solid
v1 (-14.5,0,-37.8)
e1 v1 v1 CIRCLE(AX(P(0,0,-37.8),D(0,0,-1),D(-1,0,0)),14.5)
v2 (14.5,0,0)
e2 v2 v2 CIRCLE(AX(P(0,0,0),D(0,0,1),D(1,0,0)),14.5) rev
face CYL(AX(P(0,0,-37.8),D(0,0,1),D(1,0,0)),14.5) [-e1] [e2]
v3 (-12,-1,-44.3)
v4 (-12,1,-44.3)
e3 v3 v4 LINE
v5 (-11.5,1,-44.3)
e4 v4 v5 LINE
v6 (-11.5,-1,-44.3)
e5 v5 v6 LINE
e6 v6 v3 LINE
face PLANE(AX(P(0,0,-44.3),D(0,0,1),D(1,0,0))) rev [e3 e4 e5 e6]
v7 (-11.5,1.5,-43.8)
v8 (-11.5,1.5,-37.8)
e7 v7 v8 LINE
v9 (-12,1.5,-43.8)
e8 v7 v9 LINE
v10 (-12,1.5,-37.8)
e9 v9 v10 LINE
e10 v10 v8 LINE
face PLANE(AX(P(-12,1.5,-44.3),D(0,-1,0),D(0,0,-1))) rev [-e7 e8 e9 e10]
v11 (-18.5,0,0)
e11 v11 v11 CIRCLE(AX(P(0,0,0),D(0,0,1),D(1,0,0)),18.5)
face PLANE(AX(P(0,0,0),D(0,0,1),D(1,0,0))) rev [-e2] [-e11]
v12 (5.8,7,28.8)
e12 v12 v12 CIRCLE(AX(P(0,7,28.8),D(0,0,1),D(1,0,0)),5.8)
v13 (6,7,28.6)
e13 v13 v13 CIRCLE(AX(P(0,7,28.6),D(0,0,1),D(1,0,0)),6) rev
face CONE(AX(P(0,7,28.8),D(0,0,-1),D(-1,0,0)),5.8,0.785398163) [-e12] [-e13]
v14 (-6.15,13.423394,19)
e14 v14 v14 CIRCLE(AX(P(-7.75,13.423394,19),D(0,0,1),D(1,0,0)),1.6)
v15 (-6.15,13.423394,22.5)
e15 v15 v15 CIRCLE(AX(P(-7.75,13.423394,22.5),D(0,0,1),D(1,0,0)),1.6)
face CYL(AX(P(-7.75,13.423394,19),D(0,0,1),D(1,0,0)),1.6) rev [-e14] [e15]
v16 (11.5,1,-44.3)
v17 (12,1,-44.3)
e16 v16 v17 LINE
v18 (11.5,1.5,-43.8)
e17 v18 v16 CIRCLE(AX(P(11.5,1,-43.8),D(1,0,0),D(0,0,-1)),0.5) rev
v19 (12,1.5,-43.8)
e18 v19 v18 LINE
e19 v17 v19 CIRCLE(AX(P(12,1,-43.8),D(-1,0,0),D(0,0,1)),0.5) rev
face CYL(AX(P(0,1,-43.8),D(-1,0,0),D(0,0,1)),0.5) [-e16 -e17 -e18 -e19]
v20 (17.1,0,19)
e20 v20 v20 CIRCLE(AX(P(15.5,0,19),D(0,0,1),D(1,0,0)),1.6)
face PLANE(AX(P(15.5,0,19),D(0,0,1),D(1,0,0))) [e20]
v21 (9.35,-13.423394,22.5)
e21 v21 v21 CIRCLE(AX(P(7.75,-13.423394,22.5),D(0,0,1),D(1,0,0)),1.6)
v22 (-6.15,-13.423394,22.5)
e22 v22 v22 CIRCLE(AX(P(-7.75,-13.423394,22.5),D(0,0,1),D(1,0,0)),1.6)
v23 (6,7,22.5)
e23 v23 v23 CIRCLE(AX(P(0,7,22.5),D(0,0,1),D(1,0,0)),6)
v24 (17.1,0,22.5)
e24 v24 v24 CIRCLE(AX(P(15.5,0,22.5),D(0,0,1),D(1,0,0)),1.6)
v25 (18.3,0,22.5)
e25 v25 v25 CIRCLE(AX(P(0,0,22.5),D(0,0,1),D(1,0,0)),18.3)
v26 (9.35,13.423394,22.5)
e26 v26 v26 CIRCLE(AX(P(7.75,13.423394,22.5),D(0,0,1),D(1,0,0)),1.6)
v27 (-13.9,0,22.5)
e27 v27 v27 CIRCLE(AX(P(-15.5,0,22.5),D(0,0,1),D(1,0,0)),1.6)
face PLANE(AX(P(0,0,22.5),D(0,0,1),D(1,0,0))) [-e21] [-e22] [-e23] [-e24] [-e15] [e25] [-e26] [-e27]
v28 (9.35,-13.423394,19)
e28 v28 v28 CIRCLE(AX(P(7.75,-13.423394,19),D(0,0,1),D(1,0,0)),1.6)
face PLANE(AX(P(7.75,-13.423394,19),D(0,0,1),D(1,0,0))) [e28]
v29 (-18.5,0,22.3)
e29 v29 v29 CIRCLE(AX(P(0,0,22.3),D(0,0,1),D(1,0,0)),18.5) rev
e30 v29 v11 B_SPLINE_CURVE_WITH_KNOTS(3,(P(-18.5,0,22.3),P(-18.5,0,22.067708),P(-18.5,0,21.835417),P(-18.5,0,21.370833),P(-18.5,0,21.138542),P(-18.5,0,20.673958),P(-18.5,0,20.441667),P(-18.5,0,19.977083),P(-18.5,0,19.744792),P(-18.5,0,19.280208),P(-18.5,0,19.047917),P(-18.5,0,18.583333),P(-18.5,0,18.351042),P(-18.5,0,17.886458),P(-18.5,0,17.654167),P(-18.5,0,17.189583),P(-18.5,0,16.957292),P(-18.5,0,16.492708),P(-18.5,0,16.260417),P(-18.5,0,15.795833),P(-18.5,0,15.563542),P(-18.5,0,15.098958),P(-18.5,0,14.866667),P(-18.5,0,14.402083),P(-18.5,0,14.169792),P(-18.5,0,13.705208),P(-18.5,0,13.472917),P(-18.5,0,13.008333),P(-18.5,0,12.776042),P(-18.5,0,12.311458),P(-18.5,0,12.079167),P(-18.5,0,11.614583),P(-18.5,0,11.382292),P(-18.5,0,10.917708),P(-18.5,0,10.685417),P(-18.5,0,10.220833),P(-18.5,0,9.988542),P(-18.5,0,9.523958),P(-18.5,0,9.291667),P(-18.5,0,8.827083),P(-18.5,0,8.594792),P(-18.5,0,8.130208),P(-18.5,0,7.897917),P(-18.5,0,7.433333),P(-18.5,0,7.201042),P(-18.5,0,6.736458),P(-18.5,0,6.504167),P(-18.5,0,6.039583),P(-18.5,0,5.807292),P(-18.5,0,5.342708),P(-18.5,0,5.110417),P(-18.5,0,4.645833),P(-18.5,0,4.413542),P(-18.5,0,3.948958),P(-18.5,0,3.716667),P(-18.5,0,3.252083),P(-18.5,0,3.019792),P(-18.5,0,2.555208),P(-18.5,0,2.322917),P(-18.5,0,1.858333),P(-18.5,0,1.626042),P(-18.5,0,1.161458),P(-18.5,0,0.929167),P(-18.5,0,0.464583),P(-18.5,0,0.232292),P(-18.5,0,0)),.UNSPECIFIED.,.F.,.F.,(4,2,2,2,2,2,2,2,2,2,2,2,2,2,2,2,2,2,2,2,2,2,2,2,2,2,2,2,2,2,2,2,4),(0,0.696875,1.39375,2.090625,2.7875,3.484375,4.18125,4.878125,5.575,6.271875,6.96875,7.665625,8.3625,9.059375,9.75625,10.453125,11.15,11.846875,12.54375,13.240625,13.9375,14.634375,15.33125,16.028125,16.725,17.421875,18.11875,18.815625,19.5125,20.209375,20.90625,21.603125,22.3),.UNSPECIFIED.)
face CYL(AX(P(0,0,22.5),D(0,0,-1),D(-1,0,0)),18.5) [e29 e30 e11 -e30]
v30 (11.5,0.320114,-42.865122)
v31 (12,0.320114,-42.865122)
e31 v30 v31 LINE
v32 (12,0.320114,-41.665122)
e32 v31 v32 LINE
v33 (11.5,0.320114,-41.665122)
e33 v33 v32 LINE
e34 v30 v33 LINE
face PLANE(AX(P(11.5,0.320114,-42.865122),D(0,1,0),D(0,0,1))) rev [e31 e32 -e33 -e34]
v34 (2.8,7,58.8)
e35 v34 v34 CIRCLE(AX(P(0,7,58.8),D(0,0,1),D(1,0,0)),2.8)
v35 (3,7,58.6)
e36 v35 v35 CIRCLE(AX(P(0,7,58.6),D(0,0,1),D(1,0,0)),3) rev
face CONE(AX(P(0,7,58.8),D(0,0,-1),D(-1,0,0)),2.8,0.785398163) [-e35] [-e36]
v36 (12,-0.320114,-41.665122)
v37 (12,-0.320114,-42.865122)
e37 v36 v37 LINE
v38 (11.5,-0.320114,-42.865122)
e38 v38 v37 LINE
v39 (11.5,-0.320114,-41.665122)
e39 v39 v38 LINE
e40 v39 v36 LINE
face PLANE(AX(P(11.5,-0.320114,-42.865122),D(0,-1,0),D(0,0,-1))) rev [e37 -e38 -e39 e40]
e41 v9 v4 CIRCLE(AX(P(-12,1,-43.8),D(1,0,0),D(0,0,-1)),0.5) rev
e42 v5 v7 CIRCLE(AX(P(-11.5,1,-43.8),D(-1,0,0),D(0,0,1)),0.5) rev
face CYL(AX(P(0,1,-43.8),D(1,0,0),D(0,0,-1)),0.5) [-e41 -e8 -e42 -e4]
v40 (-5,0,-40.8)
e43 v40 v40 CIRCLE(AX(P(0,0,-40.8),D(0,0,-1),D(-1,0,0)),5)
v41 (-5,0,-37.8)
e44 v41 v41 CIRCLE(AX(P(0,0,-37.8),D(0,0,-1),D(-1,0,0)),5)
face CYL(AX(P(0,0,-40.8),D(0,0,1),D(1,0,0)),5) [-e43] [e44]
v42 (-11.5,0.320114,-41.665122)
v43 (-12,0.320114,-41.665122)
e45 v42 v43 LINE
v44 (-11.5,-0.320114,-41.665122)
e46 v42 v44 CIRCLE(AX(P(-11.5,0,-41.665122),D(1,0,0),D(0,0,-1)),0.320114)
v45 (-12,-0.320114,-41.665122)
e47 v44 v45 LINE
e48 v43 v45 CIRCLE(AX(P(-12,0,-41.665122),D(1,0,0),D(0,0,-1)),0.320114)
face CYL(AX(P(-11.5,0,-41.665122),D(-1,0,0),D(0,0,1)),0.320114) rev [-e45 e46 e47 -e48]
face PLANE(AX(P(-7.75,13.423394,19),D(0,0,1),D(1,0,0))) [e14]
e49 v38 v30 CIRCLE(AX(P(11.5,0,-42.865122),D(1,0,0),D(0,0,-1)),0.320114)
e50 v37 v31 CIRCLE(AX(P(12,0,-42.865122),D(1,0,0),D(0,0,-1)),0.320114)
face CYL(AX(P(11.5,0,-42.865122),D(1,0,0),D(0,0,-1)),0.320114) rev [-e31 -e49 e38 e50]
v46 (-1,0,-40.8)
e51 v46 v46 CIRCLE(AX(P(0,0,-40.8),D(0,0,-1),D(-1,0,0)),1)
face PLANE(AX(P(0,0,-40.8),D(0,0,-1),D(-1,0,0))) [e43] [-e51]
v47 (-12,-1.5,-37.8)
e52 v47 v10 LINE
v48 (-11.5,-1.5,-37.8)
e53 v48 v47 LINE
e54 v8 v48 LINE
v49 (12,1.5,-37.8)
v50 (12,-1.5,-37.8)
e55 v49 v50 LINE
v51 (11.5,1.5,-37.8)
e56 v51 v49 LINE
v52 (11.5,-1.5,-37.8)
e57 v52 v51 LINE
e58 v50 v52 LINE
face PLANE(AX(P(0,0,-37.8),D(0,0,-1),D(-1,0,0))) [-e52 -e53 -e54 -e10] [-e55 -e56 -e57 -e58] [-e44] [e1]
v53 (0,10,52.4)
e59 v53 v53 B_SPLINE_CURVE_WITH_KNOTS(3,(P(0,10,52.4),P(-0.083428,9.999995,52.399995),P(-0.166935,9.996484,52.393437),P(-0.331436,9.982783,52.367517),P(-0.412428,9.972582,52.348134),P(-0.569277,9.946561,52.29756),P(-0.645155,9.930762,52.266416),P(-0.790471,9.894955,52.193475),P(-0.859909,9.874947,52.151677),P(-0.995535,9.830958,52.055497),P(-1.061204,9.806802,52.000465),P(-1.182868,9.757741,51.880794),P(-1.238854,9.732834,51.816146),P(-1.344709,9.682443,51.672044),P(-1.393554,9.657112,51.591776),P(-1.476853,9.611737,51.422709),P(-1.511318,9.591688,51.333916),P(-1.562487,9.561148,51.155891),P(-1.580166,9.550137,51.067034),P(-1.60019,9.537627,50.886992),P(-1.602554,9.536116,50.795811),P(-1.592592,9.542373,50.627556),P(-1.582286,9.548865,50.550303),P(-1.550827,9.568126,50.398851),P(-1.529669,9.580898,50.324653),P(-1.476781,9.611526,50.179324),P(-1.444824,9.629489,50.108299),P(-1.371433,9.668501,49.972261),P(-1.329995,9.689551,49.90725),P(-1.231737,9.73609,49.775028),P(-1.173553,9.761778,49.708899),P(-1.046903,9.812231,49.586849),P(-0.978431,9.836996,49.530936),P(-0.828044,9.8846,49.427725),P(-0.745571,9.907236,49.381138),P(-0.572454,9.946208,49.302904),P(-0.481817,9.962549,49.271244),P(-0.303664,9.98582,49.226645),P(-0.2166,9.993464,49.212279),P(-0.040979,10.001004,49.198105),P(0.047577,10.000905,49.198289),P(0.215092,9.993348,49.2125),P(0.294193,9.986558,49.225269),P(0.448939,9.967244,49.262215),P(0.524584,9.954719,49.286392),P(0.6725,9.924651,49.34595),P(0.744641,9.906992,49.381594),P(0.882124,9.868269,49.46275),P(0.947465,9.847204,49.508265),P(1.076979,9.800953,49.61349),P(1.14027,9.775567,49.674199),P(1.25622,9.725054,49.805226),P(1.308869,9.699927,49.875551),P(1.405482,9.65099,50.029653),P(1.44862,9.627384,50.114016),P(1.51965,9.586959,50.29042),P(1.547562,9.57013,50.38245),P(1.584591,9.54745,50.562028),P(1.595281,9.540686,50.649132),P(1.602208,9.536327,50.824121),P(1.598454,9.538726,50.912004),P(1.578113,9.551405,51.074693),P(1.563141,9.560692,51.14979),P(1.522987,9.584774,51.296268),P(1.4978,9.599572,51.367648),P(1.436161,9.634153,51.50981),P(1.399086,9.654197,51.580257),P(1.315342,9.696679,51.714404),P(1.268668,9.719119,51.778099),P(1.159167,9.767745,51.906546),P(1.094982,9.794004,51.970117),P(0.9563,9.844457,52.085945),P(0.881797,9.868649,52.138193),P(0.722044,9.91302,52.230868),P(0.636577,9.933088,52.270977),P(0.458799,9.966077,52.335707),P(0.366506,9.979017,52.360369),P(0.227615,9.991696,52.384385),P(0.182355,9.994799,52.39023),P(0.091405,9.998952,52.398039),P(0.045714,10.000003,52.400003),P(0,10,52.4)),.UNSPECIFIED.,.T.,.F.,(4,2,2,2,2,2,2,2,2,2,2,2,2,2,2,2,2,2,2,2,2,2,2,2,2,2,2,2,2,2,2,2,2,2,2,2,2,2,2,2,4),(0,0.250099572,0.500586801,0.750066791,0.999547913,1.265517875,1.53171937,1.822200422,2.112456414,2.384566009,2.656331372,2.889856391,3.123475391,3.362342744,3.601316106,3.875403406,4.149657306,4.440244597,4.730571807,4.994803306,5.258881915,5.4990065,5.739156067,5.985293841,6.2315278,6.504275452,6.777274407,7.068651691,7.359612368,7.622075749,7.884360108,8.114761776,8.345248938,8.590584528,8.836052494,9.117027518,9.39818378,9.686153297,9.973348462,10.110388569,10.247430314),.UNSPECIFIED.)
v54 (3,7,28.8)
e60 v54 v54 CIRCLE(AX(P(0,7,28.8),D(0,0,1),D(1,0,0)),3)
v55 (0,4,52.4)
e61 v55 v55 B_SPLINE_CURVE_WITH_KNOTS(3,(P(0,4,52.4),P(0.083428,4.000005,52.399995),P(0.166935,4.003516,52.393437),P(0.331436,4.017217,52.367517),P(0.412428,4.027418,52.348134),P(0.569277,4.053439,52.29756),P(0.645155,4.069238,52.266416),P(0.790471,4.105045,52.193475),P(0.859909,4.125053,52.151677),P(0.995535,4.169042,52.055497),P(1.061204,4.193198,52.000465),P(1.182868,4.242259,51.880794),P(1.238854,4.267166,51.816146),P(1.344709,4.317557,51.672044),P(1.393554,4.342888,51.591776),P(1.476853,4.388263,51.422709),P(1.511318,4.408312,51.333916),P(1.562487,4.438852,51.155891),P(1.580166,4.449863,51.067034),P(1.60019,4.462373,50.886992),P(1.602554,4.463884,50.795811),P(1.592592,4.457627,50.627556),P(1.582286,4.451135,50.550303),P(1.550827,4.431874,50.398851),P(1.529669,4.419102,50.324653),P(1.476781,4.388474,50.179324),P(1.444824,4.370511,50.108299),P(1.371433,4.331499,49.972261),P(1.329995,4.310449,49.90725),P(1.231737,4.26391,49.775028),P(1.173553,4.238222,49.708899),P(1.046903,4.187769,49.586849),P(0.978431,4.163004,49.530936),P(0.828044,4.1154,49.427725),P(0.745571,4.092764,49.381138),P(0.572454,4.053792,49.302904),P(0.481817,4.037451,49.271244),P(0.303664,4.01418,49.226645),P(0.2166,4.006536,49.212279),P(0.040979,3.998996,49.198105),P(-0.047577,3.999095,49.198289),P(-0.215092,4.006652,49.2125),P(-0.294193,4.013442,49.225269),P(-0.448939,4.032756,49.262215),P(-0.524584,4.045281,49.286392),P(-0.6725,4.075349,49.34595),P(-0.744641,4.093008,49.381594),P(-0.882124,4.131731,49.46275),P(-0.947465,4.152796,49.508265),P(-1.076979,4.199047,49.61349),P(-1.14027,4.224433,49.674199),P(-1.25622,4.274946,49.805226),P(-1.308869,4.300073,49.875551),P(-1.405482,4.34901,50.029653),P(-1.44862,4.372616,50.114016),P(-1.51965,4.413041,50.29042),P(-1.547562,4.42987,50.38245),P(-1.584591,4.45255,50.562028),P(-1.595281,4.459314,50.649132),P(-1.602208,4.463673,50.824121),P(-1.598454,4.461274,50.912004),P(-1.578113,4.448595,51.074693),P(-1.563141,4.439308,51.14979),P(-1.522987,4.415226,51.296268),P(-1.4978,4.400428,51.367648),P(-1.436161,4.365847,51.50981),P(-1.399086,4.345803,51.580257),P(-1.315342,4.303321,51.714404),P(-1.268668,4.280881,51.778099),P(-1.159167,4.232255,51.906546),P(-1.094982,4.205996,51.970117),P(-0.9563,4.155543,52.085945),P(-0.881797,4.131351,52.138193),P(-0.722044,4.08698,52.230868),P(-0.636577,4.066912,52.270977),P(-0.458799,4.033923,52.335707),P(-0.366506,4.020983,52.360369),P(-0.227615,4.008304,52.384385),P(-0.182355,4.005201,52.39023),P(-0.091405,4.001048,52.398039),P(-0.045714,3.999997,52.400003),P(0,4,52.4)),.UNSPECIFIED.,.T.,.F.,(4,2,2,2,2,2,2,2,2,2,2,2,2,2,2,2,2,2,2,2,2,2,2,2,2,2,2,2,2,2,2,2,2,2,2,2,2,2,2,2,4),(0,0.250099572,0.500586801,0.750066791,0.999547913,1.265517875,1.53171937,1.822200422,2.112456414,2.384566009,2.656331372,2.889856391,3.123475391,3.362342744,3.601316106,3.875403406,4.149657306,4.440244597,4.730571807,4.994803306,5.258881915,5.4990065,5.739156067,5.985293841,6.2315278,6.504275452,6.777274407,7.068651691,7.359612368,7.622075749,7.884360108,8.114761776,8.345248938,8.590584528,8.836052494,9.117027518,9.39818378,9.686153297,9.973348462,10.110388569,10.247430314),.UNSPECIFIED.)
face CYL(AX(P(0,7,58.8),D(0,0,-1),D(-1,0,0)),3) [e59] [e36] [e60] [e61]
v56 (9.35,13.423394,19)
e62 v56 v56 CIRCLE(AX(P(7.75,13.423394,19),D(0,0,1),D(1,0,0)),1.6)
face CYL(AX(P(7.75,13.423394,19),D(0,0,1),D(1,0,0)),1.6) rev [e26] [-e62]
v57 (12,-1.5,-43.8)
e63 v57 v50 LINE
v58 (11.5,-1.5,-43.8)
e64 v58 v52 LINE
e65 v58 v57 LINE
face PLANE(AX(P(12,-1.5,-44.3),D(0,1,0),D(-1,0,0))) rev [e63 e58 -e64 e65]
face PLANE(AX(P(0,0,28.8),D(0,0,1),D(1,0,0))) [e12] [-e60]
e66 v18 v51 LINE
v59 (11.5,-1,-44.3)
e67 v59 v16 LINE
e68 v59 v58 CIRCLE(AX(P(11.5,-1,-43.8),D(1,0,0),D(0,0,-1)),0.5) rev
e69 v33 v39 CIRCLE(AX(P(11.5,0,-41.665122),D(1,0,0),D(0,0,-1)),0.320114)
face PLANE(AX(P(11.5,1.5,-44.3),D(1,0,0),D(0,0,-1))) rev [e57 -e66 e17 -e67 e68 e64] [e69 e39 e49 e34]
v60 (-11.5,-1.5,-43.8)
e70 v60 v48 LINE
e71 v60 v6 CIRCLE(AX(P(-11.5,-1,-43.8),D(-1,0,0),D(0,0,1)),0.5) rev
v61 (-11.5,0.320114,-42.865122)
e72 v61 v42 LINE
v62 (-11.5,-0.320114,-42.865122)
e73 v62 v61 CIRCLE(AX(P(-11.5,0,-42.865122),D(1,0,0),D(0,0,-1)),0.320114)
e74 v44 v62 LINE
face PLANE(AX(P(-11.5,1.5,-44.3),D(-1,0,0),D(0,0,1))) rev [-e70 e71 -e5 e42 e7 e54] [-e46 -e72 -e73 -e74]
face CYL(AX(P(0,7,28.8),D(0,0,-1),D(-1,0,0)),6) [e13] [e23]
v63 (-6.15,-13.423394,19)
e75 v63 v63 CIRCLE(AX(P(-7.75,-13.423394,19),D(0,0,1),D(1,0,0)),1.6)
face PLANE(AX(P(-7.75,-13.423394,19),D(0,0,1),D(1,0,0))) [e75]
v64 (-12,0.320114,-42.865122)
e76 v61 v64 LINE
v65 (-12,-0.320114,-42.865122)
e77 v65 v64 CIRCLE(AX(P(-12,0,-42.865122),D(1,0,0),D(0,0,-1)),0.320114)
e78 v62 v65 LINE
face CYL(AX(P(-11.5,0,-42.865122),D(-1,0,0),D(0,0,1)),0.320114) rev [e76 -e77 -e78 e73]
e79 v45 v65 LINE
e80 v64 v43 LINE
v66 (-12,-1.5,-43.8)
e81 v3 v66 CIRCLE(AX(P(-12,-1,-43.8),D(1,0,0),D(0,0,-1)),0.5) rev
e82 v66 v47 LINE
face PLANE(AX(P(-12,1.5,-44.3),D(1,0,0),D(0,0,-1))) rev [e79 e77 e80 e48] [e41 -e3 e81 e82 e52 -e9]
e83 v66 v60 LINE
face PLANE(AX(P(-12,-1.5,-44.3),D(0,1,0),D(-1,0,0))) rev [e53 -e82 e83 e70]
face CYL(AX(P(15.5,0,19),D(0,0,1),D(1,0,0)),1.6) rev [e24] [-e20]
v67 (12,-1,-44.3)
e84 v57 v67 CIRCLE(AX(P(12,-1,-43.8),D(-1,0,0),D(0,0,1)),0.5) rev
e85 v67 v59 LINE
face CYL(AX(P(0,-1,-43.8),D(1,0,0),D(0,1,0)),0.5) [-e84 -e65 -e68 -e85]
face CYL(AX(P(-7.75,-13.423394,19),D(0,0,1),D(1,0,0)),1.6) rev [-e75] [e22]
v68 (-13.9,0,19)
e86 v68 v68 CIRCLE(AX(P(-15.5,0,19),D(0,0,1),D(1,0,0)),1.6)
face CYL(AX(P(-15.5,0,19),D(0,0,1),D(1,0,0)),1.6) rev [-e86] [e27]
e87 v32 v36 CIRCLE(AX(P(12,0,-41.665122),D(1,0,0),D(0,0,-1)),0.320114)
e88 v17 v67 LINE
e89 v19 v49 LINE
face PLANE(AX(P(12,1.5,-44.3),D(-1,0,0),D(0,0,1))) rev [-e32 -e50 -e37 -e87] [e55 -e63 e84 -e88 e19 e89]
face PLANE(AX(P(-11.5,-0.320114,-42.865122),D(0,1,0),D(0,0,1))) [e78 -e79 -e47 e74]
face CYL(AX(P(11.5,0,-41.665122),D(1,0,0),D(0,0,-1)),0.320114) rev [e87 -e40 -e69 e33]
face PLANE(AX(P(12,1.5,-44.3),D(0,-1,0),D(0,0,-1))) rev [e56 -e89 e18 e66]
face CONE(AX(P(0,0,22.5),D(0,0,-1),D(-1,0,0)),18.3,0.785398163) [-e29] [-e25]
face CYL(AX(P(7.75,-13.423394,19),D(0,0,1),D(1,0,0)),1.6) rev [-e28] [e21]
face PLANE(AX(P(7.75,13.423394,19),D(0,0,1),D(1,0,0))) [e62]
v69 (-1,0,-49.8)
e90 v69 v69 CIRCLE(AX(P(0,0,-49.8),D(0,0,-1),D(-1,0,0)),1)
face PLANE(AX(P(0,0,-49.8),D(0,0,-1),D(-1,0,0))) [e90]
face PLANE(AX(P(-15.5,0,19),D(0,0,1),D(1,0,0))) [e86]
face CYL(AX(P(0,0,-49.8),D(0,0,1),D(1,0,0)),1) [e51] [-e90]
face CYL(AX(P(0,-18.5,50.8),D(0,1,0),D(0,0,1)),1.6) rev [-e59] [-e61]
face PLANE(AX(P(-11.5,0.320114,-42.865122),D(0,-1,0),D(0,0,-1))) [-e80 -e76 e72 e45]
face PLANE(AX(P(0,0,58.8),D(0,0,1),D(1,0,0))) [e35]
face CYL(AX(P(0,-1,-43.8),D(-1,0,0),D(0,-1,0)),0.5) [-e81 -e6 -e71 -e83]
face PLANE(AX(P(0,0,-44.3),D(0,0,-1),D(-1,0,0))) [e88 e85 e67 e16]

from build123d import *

# Parameters (mm, degrees)
SKETCH1_R               = 18.5
BOSS_EXTRUDE1_DEPTH     = 22.5
SKETCH2_R               = 1.6
CUT_EXTRUDE1_DEPTH      = 3.5
SKETCH3_R               = 3
BOSS_EXTRUDE2_DEPTH     = 36.3
SKETCH3_3_R             = 6
SKETCH3_3_R_2           = 3
BOSS_EXTRUDE3_DEPTH     = 6.3
SKETCH4_R               = 14.5
BOSS_EXTRUDE4_DEPTH     = 37.8
SKETCH5_R               = 5
BOSS_EXTRUDE5_DEPTH     = 3
SKETCH6_R               = 1
BOSS_EXTRUDE6_DEPTH     = 9
SKETCH7_W               = 0.5
SKETCH7_H               = 3
BOSS_EXTRUDE7_DEPTH     = 6.5
CUT_EXTRUDE2_DEPTH      = 0.5
FILLET1_R               = 0.5
CHAMFER1_SIZE           = 0.2
CUT_EXTRUDE3_DEPTH      = 67.7078706
CUT_EXTRUDE3_DEPTH_BACK = 67.7078706
SKETCH9_R               = 1.6


with BuildPart() as part:
    # Sketch1 → Boss-Extrude1 (new body)
    with BuildSketch(Plane.XY):
        Circle(SKETCH1_R)
    extrude(amount=BOSS_EXTRUDE1_DEPTH)

    # Sketch2 → Cut-Extrude1 (cut)
    with BuildSketch(Plane.XY.offset(22.5)):
        with Locations((-7.75, 13.423393759)):
            Circle(SKETCH2_R)
        with Locations((7.75, 13.423393759)):
            Circle(SKETCH2_R)
        with Locations((-15.5, 0)):
            Circle(SKETCH2_R)
        with Locations((-7.75, -13.423393759)):
            Circle(SKETCH2_R)
        with Locations((7.75, -13.423393759)):
            Circle(SKETCH2_R)
        with Locations((15.5, 0)):
            Circle(SKETCH2_R)
    extrude(amount=-CUT_EXTRUDE1_DEPTH, mode=Mode.SUBTRACT)

    # Sketch3 → Boss-Extrude2 (add)
    with BuildSketch(Plane.XY.offset(22.5)):
        with Locations((0, 7)):
            Circle(SKETCH3_R)
    extrude(amount=BOSS_EXTRUDE2_DEPTH)

    # Sketch3<3> → Boss-Extrude3 (add)
    with BuildSketch(Plane.XY.offset(22.5)):
        with Locations((0, 7)):
            Circle(SKETCH3_3_R)
        with Locations((0, 7)):
            Circle(SKETCH3_3_R_2, mode=Mode.SUBTRACT)
    extrude(amount=BOSS_EXTRUDE3_DEPTH)

    # Sketch4 → Boss-Extrude4 (add)
    with BuildSketch(Plane(origin=(0, 0, 0), x_dir=(-1, 0, 0), z_dir=(0, 0, -1))):
        Circle(SKETCH4_R)
    extrude(amount=BOSS_EXTRUDE4_DEPTH)

    # Sketch5 → Boss-Extrude5 (add)
    with BuildSketch(Plane(origin=(0, 0, -37.8), x_dir=(-1, 0, 0), z_dir=(0, 0, -1))):
        Circle(SKETCH5_R)
    extrude(amount=BOSS_EXTRUDE5_DEPTH)

    # Sketch6 → Boss-Extrude6 (add)
    with BuildSketch(Plane(origin=(0, 0, -40.8), x_dir=(-1, 0, 0), z_dir=(0, 0, -1))):
        Circle(SKETCH6_R)
    extrude(amount=BOSS_EXTRUDE6_DEPTH)

    # Sketch7 → Boss-Extrude7 (add)
    with BuildSketch(Plane(origin=(0, 0, -37.8), x_dir=(-1, 0, 0), z_dir=(0, 0, -1))):
        with Locations((-11.75, 0)):
            Rectangle(SKETCH7_W, SKETCH7_H)
        with Locations((11.75, 0)):
            Rectangle(SKETCH7_W, SKETCH7_H)
    extrude(amount=BOSS_EXTRUDE7_DEPTH)

    # Sketch8 → Cut-Extrude2 (cut)
    with BuildSketch(Plane(origin=(12, 0, 0), x_dir=(0, 0, -1), z_dir=(1, 0, 0))):
        with BuildLine():
            Line((42.865122037, -0.320114275), (41.665122037, -0.320114275))
            ThreePointArc((41.665122037, -0.320114275), (41.345007763, 0), (41.665122037, 0.320114275))
            Line((41.665122037, 0.320114275), (42.865122037, 0.320114275))
            ThreePointArc((42.865122037, 0.320114275), (43.185236312, 0), (42.865122037, -0.320114275))
        make_face()
    cut_extrude2 = extrude(amount=-CUT_EXTRUDE2_DEPTH, mode=Mode.SUBTRACT)

    # Mirror2: Cut-Extrude2 across plane
    add(cut_extrude2.mirror(Plane(origin=(0, 0, 0), x_dir=(0, 0, 1), z_dir=(1, 0, 0))), mode=Mode.SUBTRACT)

    # Fillet1
    fillet1_edges = [part.edges().sort_by_distance(p)[0] for p in [
        (-11.75, 1.5, -44.3),
        (-11.75, -1.5, -44.3),
        (11.75, 1.5, -44.3),
        (11.75, -1.5, -44.3),
    ]]
    fillet(fillet1_edges, radius=FILLET1_R)

    # Chamfer1
    chamfer1_edges = [part.edges().sort_by_distance(p)[0] for p in [
        (-18.5, 0, 22.5),
        (-6, 7, 28.8),
        (-3, 7, 58.8),
    ]]
    chamfer(chamfer1_edges, length=CHAMFER1_SIZE)

    # Sketch9 → Cut-Extrude3 (cut, two sides: drawn at the far end of the back side and taken through both)
    with BuildSketch(Plane(origin=(0, 7, 0), x_dir=(1, 0, 0), z_dir=(0, 1, 0)).offset(-CUT_EXTRUDE3_DEPTH_BACK)):
        with Locations((0, -50.8)):
            Circle(SKETCH9_R)
    extrude(amount=CUT_EXTRUDE3_DEPTH + CUT_EXTRUDE3_DEPTH_BACK, mode=Mode.SUBTRACT)


solid = part.part
